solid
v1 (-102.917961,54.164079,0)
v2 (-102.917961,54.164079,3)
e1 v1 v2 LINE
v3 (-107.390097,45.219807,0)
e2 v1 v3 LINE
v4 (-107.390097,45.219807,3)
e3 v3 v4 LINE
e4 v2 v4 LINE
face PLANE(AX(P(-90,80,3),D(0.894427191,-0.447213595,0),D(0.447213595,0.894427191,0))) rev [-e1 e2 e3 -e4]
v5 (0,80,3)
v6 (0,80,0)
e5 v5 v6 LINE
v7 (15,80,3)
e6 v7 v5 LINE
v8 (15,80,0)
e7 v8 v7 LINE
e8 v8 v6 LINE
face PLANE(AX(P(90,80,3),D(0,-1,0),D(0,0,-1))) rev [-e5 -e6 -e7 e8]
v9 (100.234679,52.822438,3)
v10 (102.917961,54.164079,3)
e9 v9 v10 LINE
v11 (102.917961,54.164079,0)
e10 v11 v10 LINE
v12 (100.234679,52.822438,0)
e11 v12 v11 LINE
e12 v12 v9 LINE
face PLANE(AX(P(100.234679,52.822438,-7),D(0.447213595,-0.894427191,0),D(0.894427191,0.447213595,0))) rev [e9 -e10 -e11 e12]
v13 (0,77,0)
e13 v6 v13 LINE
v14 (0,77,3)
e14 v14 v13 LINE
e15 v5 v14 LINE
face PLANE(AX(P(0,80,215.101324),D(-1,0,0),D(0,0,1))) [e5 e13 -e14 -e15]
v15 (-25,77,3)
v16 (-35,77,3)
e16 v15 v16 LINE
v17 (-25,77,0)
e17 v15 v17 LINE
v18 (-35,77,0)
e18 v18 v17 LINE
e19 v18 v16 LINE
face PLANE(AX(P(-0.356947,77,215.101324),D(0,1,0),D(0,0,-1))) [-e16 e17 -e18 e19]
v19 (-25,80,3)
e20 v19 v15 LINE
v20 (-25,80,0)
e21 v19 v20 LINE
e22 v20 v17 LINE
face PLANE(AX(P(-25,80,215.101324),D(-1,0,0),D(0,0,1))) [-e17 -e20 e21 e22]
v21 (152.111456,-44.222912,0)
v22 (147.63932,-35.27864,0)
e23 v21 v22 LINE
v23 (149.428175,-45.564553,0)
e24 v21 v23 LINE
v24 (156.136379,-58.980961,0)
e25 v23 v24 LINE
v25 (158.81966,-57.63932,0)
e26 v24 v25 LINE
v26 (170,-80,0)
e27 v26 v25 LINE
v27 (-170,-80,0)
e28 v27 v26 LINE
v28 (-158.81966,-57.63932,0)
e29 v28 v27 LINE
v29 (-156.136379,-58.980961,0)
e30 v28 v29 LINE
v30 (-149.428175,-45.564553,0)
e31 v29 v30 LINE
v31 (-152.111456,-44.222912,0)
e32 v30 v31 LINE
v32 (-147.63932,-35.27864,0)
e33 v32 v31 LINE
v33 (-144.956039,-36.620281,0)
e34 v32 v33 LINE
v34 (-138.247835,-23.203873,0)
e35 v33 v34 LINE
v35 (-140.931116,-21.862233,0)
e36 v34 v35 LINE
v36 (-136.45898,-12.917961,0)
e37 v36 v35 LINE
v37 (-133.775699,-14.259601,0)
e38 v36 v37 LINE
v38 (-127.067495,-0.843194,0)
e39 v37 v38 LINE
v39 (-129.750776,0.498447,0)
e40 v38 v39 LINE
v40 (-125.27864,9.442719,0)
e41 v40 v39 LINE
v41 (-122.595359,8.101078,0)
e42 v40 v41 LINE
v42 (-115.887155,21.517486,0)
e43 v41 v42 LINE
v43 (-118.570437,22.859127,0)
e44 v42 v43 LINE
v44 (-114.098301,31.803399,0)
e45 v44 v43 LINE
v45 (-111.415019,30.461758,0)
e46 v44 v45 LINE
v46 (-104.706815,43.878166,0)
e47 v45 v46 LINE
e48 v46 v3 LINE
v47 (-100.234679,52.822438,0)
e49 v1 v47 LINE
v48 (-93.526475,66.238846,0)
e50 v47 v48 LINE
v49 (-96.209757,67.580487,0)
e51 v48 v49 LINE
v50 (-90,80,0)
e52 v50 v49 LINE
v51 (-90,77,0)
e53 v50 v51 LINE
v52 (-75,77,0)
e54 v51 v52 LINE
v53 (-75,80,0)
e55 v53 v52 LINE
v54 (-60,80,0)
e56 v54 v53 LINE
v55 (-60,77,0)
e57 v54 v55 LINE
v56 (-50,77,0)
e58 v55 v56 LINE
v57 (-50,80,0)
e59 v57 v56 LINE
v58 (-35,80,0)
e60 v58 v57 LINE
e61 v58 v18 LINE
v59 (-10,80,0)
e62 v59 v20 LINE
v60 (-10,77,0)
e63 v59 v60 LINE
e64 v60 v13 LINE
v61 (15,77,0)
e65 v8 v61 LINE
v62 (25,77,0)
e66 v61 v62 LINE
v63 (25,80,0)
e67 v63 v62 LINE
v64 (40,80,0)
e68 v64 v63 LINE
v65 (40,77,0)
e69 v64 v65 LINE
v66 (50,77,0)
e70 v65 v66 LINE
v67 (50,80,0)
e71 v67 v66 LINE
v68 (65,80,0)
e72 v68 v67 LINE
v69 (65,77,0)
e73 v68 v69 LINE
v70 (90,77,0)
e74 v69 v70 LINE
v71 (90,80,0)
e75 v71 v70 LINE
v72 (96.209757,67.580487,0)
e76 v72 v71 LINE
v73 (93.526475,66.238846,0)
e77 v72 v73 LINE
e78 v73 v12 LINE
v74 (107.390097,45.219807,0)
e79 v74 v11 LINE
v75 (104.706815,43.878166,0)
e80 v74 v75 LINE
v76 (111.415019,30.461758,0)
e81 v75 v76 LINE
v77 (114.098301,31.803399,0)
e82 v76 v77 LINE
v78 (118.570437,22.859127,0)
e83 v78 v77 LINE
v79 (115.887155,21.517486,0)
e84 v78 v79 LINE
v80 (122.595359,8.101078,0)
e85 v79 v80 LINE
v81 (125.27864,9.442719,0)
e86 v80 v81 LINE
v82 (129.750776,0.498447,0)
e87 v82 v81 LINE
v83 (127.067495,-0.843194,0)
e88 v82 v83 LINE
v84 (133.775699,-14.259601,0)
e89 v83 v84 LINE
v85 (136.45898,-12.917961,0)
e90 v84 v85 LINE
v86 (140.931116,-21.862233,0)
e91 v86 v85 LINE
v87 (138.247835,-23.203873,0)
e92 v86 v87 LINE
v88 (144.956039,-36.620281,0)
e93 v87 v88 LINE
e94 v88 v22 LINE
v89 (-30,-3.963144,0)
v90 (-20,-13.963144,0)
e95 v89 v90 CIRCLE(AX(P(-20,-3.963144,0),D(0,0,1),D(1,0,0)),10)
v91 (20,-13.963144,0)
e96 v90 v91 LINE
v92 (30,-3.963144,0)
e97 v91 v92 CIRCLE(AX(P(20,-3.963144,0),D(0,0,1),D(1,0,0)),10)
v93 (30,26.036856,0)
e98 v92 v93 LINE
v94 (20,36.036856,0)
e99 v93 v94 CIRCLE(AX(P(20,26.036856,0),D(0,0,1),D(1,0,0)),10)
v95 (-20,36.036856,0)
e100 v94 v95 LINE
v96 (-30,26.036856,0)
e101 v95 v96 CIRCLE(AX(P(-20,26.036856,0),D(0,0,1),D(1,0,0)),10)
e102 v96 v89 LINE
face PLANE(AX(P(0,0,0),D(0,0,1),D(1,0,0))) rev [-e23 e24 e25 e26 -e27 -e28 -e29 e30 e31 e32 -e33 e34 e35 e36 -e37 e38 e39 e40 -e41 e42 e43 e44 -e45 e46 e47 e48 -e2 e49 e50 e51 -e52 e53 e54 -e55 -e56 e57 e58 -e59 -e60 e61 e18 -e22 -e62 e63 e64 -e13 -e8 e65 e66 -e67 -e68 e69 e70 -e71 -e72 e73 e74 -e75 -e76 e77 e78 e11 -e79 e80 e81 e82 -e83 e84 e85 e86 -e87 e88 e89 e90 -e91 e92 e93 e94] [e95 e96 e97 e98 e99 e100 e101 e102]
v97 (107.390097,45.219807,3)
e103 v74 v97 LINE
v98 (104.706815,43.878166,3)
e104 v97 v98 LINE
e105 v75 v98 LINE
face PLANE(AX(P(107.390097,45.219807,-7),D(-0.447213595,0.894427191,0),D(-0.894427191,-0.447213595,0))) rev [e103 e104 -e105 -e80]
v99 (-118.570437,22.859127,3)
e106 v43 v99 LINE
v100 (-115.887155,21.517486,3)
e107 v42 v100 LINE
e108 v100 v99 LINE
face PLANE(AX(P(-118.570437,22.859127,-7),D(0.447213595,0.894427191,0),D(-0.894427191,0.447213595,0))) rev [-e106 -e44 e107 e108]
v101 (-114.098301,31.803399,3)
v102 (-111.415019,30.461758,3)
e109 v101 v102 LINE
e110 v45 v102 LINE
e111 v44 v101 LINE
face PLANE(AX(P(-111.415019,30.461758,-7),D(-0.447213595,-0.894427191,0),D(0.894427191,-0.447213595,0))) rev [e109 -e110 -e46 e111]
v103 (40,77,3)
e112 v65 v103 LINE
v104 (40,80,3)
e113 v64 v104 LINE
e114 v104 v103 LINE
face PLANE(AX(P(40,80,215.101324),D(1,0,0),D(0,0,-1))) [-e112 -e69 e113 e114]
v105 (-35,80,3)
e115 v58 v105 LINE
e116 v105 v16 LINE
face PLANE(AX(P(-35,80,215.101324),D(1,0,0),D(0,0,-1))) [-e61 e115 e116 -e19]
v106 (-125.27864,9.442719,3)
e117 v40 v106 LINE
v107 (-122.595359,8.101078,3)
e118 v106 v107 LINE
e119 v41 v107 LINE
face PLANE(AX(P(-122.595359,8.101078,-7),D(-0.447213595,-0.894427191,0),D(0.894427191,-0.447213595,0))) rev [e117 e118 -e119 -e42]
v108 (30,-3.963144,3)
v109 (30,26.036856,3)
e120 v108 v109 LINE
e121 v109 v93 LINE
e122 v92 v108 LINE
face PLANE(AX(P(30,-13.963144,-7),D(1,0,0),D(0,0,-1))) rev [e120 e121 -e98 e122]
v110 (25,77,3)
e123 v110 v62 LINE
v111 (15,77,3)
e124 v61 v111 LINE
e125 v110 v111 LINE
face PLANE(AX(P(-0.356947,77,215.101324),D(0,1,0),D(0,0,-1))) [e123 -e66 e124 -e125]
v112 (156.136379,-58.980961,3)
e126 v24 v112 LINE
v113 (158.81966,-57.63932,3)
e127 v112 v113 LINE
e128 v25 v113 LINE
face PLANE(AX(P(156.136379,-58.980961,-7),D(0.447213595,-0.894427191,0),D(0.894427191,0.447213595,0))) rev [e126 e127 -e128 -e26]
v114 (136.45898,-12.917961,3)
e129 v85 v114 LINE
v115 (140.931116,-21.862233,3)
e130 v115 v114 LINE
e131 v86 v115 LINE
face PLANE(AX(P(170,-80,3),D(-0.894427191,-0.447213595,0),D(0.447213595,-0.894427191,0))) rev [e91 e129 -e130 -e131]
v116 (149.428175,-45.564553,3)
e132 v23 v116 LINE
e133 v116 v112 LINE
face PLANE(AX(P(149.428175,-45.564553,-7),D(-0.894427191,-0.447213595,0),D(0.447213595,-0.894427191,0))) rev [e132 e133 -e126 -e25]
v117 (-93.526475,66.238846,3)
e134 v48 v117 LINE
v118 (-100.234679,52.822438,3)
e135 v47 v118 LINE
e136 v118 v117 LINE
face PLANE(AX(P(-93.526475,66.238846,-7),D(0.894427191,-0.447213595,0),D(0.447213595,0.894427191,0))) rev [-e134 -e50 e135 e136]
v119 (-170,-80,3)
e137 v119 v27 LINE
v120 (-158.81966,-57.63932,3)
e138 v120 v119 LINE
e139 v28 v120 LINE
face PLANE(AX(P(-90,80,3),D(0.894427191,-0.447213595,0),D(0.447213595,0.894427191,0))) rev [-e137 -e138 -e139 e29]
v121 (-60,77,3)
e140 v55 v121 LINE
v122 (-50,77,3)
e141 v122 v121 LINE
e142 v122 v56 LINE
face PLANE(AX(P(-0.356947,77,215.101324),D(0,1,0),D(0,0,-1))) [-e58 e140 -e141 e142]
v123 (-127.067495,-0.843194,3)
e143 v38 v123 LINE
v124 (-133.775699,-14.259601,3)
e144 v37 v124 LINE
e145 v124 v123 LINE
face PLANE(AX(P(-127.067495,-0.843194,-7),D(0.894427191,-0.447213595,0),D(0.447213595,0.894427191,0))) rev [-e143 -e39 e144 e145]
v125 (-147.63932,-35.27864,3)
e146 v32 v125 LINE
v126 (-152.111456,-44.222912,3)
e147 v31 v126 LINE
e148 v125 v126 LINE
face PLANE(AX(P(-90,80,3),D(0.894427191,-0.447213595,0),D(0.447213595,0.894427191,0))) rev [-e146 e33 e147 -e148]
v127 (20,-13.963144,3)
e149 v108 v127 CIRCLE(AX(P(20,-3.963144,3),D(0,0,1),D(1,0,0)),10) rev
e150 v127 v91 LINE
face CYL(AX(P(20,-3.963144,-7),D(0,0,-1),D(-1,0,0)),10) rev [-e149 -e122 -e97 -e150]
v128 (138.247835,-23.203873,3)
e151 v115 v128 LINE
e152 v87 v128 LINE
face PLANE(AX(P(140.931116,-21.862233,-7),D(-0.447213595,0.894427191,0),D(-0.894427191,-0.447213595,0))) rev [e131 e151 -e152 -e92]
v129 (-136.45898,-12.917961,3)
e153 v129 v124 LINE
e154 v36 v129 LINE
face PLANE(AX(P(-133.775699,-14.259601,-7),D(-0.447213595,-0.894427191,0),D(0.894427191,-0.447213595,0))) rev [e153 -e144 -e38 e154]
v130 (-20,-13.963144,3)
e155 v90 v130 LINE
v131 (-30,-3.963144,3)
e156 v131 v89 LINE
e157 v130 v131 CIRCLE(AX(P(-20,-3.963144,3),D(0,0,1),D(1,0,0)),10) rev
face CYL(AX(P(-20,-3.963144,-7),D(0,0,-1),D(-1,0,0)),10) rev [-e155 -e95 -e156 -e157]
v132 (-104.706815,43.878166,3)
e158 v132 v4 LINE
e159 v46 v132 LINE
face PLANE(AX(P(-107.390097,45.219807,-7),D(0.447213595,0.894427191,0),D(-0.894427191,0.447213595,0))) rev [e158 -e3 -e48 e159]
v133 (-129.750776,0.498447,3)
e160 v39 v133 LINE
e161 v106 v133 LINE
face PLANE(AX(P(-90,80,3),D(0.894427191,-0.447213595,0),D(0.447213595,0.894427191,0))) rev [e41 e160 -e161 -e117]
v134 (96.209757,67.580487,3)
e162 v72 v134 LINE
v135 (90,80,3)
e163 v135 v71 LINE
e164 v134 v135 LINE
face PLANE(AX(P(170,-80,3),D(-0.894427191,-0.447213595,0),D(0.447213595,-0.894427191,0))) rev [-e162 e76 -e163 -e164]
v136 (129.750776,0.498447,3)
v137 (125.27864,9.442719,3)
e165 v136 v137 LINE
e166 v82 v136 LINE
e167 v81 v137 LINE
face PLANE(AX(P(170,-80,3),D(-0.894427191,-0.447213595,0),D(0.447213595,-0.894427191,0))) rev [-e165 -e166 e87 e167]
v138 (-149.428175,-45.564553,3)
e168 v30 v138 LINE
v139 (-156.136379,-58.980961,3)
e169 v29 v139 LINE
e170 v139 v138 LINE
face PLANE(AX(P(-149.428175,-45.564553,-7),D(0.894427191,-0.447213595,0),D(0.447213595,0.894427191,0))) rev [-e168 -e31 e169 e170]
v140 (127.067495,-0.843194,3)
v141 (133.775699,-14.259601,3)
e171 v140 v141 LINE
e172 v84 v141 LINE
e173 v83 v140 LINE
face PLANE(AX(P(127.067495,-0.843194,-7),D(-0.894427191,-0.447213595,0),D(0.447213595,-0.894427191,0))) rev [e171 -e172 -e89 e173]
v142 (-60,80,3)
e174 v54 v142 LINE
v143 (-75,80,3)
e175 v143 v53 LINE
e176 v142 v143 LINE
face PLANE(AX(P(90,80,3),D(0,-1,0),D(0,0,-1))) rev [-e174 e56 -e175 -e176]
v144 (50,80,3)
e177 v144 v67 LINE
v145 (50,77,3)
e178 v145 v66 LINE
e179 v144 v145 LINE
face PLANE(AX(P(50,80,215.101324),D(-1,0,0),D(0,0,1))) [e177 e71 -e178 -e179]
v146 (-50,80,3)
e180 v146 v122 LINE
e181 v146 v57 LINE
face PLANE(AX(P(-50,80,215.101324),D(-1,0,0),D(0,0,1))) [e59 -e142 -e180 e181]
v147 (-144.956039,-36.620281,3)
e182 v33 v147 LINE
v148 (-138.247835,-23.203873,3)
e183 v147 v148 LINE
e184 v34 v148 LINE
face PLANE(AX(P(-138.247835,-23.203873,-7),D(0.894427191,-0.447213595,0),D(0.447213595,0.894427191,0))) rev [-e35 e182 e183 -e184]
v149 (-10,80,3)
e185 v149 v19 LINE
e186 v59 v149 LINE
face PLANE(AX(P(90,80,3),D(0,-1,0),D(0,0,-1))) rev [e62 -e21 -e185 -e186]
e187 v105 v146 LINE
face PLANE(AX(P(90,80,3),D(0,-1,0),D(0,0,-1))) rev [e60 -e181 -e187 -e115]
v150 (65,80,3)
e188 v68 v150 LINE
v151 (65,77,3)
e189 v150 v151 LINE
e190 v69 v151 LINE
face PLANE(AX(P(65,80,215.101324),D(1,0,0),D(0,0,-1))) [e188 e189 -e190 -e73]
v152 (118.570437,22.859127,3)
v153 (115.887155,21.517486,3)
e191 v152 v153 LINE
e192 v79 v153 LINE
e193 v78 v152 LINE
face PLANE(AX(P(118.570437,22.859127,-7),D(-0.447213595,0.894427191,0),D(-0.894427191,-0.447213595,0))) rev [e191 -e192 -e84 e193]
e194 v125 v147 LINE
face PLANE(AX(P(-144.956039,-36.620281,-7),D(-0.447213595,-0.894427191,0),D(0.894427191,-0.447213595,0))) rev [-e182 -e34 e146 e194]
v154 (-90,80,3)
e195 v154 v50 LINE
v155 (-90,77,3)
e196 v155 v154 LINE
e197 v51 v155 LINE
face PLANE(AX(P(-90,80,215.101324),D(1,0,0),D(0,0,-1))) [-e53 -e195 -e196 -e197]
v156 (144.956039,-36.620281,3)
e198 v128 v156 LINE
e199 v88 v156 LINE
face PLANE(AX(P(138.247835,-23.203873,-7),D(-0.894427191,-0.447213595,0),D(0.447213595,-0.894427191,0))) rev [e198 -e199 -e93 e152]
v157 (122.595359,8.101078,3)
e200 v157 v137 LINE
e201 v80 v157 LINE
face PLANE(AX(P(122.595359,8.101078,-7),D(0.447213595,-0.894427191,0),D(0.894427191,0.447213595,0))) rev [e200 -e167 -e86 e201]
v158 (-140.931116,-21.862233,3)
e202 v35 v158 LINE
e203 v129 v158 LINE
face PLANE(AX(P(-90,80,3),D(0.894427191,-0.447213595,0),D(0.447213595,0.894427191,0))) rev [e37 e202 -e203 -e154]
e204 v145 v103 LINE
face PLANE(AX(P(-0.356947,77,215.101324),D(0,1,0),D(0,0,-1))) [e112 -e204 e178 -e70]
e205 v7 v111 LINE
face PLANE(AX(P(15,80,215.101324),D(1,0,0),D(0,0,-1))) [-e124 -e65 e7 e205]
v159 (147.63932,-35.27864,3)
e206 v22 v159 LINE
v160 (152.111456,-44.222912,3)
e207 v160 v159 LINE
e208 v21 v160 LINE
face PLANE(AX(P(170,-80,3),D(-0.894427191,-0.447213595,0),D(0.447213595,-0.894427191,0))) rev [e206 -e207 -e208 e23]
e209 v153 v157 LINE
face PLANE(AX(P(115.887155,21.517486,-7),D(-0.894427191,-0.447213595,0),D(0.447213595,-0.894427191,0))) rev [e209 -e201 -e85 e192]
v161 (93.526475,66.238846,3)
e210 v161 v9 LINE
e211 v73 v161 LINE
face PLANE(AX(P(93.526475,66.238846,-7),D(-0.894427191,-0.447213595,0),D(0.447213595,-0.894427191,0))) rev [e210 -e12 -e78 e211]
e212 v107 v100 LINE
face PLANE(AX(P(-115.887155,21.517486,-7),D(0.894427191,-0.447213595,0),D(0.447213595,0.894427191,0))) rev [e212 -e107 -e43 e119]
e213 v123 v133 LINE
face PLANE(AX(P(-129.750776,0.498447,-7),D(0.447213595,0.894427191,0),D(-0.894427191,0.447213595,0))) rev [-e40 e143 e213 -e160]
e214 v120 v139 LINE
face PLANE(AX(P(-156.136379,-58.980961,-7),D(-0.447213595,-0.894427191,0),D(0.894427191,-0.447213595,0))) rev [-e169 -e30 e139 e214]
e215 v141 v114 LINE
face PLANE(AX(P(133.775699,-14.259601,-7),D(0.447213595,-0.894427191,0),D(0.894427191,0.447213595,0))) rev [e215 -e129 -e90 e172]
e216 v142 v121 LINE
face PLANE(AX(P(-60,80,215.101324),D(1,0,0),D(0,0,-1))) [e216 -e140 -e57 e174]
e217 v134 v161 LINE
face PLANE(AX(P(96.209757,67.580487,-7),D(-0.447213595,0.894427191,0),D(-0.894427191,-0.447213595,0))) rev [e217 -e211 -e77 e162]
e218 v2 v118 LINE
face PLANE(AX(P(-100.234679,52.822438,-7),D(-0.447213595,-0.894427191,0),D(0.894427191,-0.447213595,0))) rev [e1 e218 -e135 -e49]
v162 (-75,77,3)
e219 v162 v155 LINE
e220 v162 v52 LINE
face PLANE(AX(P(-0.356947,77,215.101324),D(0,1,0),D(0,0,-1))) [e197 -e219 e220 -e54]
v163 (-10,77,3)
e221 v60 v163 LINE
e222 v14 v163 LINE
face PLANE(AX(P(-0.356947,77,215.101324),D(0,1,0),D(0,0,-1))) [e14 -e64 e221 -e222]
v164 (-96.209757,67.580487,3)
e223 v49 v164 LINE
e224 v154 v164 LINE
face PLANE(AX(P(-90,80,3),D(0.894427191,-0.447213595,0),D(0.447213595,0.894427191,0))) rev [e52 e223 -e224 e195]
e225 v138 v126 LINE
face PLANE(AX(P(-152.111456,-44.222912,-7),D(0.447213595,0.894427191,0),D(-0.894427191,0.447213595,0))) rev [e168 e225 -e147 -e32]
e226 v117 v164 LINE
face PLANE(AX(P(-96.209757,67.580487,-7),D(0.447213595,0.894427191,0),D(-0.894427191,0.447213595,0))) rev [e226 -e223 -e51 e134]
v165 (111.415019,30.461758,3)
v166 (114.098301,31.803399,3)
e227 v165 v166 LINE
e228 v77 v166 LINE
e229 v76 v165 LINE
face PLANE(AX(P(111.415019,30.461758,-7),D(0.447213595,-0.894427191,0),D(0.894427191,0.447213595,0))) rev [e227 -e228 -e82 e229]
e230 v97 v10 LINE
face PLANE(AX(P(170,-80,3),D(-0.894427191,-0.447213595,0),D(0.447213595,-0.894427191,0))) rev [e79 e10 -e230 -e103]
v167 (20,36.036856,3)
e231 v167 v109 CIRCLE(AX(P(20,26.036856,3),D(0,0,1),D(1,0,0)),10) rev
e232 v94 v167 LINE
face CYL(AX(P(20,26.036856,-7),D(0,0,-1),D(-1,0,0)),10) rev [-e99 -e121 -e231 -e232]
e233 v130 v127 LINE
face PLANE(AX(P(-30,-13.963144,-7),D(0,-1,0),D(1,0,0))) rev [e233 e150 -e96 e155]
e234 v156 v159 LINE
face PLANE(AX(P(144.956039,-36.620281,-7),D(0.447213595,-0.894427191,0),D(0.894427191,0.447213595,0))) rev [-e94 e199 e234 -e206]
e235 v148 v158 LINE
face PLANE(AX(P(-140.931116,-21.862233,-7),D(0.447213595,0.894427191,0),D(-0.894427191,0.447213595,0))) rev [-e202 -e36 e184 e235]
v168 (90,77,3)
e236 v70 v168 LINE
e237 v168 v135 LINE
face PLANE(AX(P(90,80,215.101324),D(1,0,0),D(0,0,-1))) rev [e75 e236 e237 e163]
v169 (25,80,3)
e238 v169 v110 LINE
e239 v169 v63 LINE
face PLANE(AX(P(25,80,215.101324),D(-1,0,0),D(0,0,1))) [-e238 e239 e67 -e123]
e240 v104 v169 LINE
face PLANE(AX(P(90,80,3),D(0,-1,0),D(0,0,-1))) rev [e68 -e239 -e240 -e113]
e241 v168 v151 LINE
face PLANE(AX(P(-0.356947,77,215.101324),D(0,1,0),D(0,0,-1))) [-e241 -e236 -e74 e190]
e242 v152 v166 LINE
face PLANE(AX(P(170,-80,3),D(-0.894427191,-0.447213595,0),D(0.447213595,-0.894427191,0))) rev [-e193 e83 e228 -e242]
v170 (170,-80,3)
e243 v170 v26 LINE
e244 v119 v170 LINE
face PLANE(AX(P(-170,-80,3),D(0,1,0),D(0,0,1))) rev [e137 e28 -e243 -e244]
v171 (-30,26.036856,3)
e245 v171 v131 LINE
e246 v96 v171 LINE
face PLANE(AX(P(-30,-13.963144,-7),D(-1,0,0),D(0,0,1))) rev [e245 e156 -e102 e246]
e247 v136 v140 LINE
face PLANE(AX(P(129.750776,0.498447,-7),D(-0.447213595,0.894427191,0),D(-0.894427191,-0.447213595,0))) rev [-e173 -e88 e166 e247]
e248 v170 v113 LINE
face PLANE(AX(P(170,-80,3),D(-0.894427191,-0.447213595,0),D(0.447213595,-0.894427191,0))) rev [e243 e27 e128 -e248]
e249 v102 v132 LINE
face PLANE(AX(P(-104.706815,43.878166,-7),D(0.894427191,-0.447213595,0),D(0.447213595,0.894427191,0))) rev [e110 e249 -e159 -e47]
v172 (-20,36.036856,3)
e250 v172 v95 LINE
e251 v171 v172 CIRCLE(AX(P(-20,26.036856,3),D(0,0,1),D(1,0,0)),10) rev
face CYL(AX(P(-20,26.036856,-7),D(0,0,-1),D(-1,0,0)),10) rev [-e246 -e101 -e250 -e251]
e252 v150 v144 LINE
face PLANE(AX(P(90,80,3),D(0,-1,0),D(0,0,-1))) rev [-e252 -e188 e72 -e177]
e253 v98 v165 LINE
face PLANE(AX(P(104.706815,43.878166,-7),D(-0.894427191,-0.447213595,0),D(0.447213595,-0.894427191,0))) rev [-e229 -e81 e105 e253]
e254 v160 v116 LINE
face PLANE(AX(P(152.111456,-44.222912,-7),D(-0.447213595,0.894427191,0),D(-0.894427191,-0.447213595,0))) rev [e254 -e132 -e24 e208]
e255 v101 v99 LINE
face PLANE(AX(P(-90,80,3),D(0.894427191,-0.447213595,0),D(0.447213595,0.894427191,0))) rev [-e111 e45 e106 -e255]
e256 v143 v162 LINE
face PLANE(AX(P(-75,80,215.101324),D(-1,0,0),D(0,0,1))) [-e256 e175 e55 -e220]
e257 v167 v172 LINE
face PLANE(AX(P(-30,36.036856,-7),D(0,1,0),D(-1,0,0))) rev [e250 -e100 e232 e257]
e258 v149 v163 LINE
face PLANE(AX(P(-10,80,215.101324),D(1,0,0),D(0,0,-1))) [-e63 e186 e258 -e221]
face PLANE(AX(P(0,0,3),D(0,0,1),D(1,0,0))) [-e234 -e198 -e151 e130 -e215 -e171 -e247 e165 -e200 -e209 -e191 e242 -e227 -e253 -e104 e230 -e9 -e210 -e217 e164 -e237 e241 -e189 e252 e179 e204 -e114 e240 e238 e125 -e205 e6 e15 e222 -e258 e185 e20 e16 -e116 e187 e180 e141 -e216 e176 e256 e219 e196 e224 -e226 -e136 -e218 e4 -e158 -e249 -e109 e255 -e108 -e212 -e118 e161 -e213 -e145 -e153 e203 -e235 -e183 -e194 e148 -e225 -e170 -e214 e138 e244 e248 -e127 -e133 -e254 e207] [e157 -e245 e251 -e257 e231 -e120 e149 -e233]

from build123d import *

# Parameters (mm, degrees)
BOSS_EXTRUDE1_DEPTH = 3
CUT_EXTRUDE1_DEPTH  = 10
LPATTERN1_COUNT     = 6
LPATTERN1_PITCH     = 25
CUT_EXTRUDE2_DEPTH  = 10
LPATTERN2_COUNT     = 6
LPATTERN2_PITCH     = 25
CAVITY1_START       = 77
CAVITY1_OUTLINE_W   = 15
CAVITY1_OUTLINE_H   = 3
CAVITY1_OUTLINE_W_2 = 10
CAVITY1_OUTLINE_W_3 = 25
CAVITY1_DEPTH       = 3
SKETCH5_W           = 60
SKETCH5_H           = 50
CUT_EXTRUDE3_DEPTH  = 10
FILLET1_R           = 10


# Read off the part's stored shape, not the designer's step: Cavity1
with BuildPart() as part:
    # Sketch1 → Boss-Extrude1 (new body)
    with BuildSketch(Plane.XY):
        Polygon((-170, -80), (170, -80), (90, 80), (-90, 80), align=None)
    extrude(amount=BOSS_EXTRUDE1_DEPTH)

    # Sketch2 → Cut-Extrude1 (cut)
    with BuildSketch(Plane.XY.offset(3)):
        Polygon((-158.819660113, -57.639320225), (-152.11145618, -44.22291236), (-149.428174607, -45.564553147), (-156.13637854, -58.980961012), align=None)
    cut_extrude1 = extrude(amount=-CUT_EXTRUDE1_DEPTH, mode=Mode.SUBTRACT)

    # LPattern1: Cut-Extrude1 ×6
    with Locations(*[Vector(0.44721359549995776, 0.894427190999916, 0) * (i * LPATTERN1_PITCH) for i in range(1, LPATTERN1_COUNT)]):
        add(cut_extrude1, mode=Mode.SUBTRACT)

    # Sketch3 → Cut-Extrude2 (cut)
    with BuildSketch(Plane.XY.offset(3)):
        Polygon((158.819660113, -57.639320225), (152.11145618, -44.22291236), (149.428174607, -45.564553147), (156.13637854, -58.980961012), align=None)
    cut_extrude2 = extrude(amount=-CUT_EXTRUDE2_DEPTH, mode=Mode.SUBTRACT)

    # LPattern2: Cut-Extrude2 ×6
    with Locations(*[Vector(-0.4472135954999582, 0.8944271909999159, 0) * (i * LPATTERN2_PITCH) for i in range(1, LPATTERN2_COUNT)]):
        add(cut_extrude2, mode=Mode.SUBTRACT)

    # Cavity1 outline → Cavity1 (cut)
    with BuildSketch(Plane(origin=(0, 0, 0), x_dir=(1, 0, 0), z_dir=(0, 1, 0)).offset(CAVITY1_START)):
        with Locations((-82.5, -1.5)):
            Rectangle(CAVITY1_OUTLINE_W, CAVITY1_OUTLINE_H)
        with Locations((-55, -1.5)):
            Rectangle(CAVITY1_OUTLINE_W_2, CAVITY1_OUTLINE_H)
        with Locations((-30, -1.5)):
            Rectangle(CAVITY1_OUTLINE_W_2, CAVITY1_OUTLINE_H)
        with Locations((-5, -1.5)):
            Rectangle(CAVITY1_OUTLINE_W_2, CAVITY1_OUTLINE_H)
        with Locations((20, -1.5)):
            Rectangle(CAVITY1_OUTLINE_W_2, CAVITY1_OUTLINE_H)
        with Locations((45, -1.5)):
            Rectangle(CAVITY1_OUTLINE_W_2, CAVITY1_OUTLINE_H)
        with Locations((77.5, -1.5)):
            Rectangle(CAVITY1_OUTLINE_W_3, CAVITY1_OUTLINE_H)
    extrude(amount=CAVITY1_DEPTH, mode=Mode.SUBTRACT)

    # Sketch5 → Cut-Extrude3 (cut)
    with BuildSketch(Plane.XY.offset(3)):
        with Locations((0, 11.03685601)):
            Rectangle(SKETCH5_W, SKETCH5_H)
    extrude(amount=-CUT_EXTRUDE3_DEPTH, mode=Mode.SUBTRACT)

    # Fillet1
    fillet1_edges = [part.edges().sort_by_distance(p)[0] for p in [
        (30, 36.03685601, 1.5),
        (30, -13.96314399, 1.5),
        (-30, -13.96314399, 1.5),
        (-30, 36.03685601, 1.5),
    ]]
    fillet(fillet1_edges, radius=FILLET1_R)


solid = part.part
